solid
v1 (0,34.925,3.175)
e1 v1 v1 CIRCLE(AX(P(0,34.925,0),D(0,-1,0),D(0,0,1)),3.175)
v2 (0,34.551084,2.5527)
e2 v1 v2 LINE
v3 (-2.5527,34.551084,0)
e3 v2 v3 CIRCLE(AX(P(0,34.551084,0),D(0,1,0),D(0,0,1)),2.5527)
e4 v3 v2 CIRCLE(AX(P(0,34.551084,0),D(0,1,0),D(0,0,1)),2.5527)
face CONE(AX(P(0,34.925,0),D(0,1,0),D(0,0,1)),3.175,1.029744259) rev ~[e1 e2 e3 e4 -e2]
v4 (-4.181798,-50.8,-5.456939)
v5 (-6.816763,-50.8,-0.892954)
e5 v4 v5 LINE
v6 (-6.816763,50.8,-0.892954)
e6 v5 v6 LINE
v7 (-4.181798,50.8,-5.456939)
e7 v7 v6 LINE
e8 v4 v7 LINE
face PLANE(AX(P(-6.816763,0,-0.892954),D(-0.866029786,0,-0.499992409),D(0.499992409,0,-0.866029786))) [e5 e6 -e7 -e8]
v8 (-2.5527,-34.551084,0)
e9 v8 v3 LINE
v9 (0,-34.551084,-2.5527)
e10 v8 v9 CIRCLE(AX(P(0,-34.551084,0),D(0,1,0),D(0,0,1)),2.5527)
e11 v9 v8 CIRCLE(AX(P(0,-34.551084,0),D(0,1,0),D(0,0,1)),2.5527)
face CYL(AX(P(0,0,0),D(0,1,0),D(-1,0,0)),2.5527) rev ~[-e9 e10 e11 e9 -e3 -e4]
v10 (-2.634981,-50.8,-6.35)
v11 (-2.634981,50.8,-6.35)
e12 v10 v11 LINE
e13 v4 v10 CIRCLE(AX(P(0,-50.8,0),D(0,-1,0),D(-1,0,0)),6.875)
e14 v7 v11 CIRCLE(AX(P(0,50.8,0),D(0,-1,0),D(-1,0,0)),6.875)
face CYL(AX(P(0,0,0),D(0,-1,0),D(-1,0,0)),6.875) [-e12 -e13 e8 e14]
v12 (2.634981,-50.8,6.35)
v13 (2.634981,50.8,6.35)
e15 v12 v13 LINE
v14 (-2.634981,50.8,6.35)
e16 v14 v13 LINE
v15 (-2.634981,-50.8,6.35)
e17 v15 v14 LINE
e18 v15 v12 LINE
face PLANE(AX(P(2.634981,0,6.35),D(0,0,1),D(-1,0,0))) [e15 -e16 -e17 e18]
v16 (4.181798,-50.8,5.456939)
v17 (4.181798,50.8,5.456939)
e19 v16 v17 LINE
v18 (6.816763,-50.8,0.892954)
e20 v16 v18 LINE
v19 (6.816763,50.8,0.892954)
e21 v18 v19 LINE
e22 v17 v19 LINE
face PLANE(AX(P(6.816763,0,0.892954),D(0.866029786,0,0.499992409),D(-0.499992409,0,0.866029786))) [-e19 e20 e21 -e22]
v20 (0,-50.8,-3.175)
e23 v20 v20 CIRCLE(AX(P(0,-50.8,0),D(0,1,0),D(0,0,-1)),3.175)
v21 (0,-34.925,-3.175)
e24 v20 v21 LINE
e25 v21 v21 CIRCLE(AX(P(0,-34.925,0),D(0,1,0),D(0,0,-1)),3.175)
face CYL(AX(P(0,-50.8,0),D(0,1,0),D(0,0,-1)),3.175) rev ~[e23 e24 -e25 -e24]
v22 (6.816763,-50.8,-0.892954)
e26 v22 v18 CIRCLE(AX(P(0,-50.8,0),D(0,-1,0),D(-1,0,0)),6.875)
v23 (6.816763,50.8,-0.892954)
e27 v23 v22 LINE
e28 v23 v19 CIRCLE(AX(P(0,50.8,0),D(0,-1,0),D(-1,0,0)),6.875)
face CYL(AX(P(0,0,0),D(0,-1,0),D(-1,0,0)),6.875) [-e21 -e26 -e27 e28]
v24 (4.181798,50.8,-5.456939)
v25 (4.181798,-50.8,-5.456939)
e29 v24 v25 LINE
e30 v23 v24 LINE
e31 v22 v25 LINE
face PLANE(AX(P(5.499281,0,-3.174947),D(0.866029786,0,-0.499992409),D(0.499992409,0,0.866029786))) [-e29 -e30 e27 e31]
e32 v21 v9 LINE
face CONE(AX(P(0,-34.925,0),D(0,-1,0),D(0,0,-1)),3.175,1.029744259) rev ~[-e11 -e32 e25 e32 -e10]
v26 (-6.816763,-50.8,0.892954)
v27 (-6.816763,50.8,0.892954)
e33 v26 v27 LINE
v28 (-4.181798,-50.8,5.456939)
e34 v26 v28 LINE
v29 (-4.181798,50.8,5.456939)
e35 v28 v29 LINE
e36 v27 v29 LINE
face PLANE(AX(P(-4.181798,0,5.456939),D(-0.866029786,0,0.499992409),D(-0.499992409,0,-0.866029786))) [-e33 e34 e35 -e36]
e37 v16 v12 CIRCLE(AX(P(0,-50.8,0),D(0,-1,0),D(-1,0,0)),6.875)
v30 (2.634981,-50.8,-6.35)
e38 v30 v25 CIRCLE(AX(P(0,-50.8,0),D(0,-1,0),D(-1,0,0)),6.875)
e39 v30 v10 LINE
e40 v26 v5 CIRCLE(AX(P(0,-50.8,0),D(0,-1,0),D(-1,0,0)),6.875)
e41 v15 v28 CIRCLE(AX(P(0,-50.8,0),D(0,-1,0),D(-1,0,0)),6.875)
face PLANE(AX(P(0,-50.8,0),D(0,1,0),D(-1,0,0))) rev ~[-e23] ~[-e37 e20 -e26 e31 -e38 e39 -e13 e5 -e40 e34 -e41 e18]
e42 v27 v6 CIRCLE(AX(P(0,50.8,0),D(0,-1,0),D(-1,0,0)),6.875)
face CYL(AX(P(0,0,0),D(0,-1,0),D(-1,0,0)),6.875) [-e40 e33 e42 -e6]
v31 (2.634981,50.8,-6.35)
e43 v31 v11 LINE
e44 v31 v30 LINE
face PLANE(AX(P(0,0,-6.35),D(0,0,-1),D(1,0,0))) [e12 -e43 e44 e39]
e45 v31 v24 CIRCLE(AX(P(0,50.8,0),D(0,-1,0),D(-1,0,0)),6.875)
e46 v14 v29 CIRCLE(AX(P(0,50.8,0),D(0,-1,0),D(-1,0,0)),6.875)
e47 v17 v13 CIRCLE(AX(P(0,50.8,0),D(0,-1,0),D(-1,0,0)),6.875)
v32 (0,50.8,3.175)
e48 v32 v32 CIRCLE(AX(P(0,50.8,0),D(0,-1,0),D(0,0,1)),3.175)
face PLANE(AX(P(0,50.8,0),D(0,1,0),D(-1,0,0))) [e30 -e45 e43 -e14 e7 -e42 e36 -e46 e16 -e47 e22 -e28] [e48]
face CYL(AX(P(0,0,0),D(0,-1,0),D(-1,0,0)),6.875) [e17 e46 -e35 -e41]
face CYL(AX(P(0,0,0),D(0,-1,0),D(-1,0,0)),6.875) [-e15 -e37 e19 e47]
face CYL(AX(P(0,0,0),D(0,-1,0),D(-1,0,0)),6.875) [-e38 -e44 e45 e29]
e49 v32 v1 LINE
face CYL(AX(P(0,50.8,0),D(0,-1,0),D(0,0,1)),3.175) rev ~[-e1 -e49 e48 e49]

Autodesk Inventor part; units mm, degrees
ref_plane "YZ Plane" through (0, 0, 0) normal (1, 0, 0) x (0, 1, 0)
ref_plane "XZ Plane" through (0, 0, 0) normal (0, 1, 0) x (-1, 0, 0)
ref_plane "XY Plane" through (0, 0, 0) normal (0, 0, 1) x (1, 0, 0)
sketch "Sketch1" plane through (0, 0, 0) normal (0, 1, 0) x (-1, 0, 0)
  line L0 (-7.3323, 0) -> (-3.6662, 6.35)
  line L1 (-3.6662, 6.35) -> (3.6662, 6.35)
  line L2 (3.6662, 6.35) -> (7.3323, 0)
  line L3 (7.3323, 0) -> (3.6662, -6.35)
  line L4 (3.6662, -6.35) -> (-3.6662, -6.35)
  line L5 (-3.6662, -6.35) -> (-7.3323, 0)
  circle A0 centre (0, 0) radius 6.875
  circle A1 centre (0, 0) radius 6.35
  line L6 (-2.7496, -4.7625) -> (2.7496, -4.7625)
  line L7 (2.7496, -4.7625) -> (5.4993, 0)
  line L8 (5.4993, 0) -> (2.7496, 4.7625)
  line L9 (2.7496, 4.7625) -> (-2.7496, 4.7625)
  line L10 (-2.7496, 4.7625) -> (-5.4993, 0)
  line L11 (-5.4993, 0) -> (-2.7496, -4.7625)
  circle A2 centre (0, 0) radius 4.7625
  circle A3 centre (0, 0) radius 5.125
  circle A4 centre (0, 0) radius 9.525
  circle A5 centre (0, 0) radius 5.9436
  circle A6 centre (0, 0) radius 2.5527
  circle A7 centre (0, 0) radius 2.0193
  circle A8 centre (0, 0) radius 3.175
  circle A9 centre (0, 0) radius 8.7313
  point P0 (-4.1818, 5.457)
  point P1 (-2.635, 6.35)
  point P2 (-6.8168, -0.893)
  point P3 (-6.8168, 0.893)
  point P4 (-2.635, -6.35)
  point P5 (-4.1818, -5.457)
  point P6 (4.1818, -5.457)
  point P7 (2.635, -6.35)
  point P8 (6.8168, -0.893)
  point P9 (6.8168, 0.893)
  point P10 (2.635, 6.35)
  point P11 (4.1818, 5.457)
  point P12 (3.1778, -4.0208)
  point P13 (1.8932, -4.7625)
  point P14 (5.071, -0.7417)
  point P15 (5.071, 0.7417)
  point P16 (1.8932, 4.7625)
  point P17 (3.1778, 4.0208)
  point P18 (-3.1778, 4.0208)
  point P19 (-1.8932, 4.7625)
  point P20 (-5.071, -0.7417)
  point P21 (-5.071, 0.7417)
  point P22 (-1.8932, -4.7625)
  point P23 (-3.1778, -4.0208)
  dimension "d0" = 12.7
  dimension "d1" = 13.75
  dimension "d2" = 12.7
  dimension "d3" = 9.525
  dimension "d4" = 10.25
  dimension "d5" = 19.05
  dimension "d6" = 11.8872
  dimension "d7" = 5.1054
  dimension "d8" = 4.0386
  dimension "d9" = 6.35
  dimension "d153" = 0.7937
extrude "BaseProfile625Round" add sketch "Sketch1" along normal mid plane 101.6 contours L0 A0 L5 | A0 L0 | L0 A1 L5 A0 | L5 A0 | L0 A0 L1 A1 | A1 | L0 L1 A0 | A1 L4 A0 L5 | A0 L4 L5 | L1 A0 | L1 A0 L2 A1 | A1 L3 A0 L4 | L4 A0 | L1 L2 A0 | L2 A0 | L2 A0 L3 A1 | A0 L3 L4 | L3 A0 | L2 L3 A0 | L11 A3 L6 | A3 L11 A2 L6 | L6 A3 | A3 L11 | A2 L7 A3 L6 | A2 | A3 L7 L6 | L11 A3 L10 A2 | L11 L10 A3 | L7 A3 | A2 L8 A3 L7 | L10 A3 | L10 A3 L9 A2 | A3 L8 L7 | L10 L9 A3 | L9 A3 | L9 A3 L8 A2 | L8 A3 | L9 L8 A3 | A4 | A5 | A6 | A7 | A8 | A9
extrude "BaseProfileRoundTube" [suppressed]
extrude "BaseProfile500Hex" [suppressed]
extrude "BaseProfile500Thunderhex" cut sketch "Sketch1" along normal mid plane 914.4 contours L0 A0 L5 | A0 L0 | L5 A0 | L0 L1 A0 | A0 L4 L5 | L1 A0 | L4 A0 | L1 L2 A0 | L2 A0 | A0 L3 L4 | L3 A0 | L2 L3 A0 | A4 | A9
extrude "BaseProfile500Round" [suppressed]
extrude "BaseProfile375Hex" [suppressed]
extrude "BaseProfile375Thunderhex" [suppressed]
extrude "BaseProfile375Round" [suppressed]
extrude "TopShaftProfile1Hex500" [suppressed]
extrude "TopShaftProfile1ThunderHex500" [suppressed]
extrude "TopShaftProfile1Round500" [suppressed]
extrude "TopShaftProfile1Hex375" [suppressed]
extrude "TopShaftProfile1ThunderHex375" [suppressed]
extrude "TopShaftProfile1Round375" [suppressed]
extrude "TopShaftProfile2ThunderHex500" [suppressed]
extrude "TopShaftProfile2Round500" [suppressed]
extrude "TopShaftProfile2Hex375" [suppressed]
extrude "TopShaftProfile2ThunderHex375" [suppressed]
extrude "TopShaftProfile2Round375" [suppressed]
sketch "Sketch2" plane through (0, 0, 0) normal (1, 0, 0) x (0, 1, 0)
  line L0 (-92.7227, 0) -> (92.7227, 0) projected
  line L1 (0, -2.6658) -> (0, 15.9951) projected
  line L2 (50.8, 5.9436) -> (51.943, 5.9436)
  line L3 (51.943, 5.9436) -> (51.943, 6.35)
  line L4 (51.943, 6.35) -> (53.0225, 6.35)
  line L5 (53.0225, 6.35) -> (53.5305, 5.842)
  line L6 (53.5305, 5.842) -> (53.5305, 0)
  line L7 (50.8, 5.9436) -> (50.8, 0) construction
  line L8 (50.8, 5.9436) -> (50.8, 6.35)
  line L9 (50.8, 6.35) -> (50.8, 6.35)
  line L10 (50.8, 6.35) -> (50.8, 0)
  line L11 (50.8, 0) -> (53.5305, 0)
  line L12 (-50.8, 5.9436) -> (-51.943, 5.9436)
  line L13 (-51.943, 5.9436) -> (-51.943, 6.35)
  line L14 (-51.943, 6.35) -> (-53.0225, 6.35)
  line L15 (-53.0225, 6.35) -> (-53.5305, 5.842)
  line L16 (-53.5305, 5.842) -> (-53.5305, 0)
  line L17 (-50.8, 5.9436) -> (-50.8, 0) construction
  line L18 (-50.8, 5.9436) -> (-50.8, 6.35)
  line L19 (-50.8, 6.35) -> (-50.8, 6.35)
  line L20 (-50.8, 6.35) -> (-50.8, 0)
  line L21 (-50.8, 0) -> (-53.5305, 0)
  line L22 (0, 0) -> (0, 13.3292)
  line L23 (50.8, 0) -> (50.8, 6.35)
  point P0 (-53.5305, 0)
  point P1 (-50.8, 0)
  point P2 (30.955, 4.7625)
  point P3 (-17.4625, 6.2865)
  point P4 (25.4, 4.7625)
  point P5 (19.4005, 4.7625)
  point P6 (-25.4, 4.7625)
  point P7 (-26.543, 4.7625)
  dimension "TopBearingRoundDia2" = 12.7
  dimension "d65" = 45
  dimension "RetainingRingChamferSize2" = 0.508
  dimension "d72" = 50.8
  dimension "TopSnapRingDia2" = 11.8872
  dimension "d119" = 0.508
  dimension "d120" = 45
  dimension "d135" = 50.8
  dimension "d138" = 53.5305
  dimension "d139" = 51.943
  dimension "d140" = 50.8
  dimension "d141" = 11.8872
  dimension "d142" = 12.7
  dimension "d143" = 51.943
  dimension "d144" = 50.8
  dimension "d145" = 53.5305
revolve "TopRetentionGroove&BearingRound" [suppressed]
sketch "Sketch3" plane through (0, 50.8, 0) normal (0, 1, 0) x (1, 0, 0)
  point P0 (0, 0)
  point P1 (0, 0)
hole "TopShaftTappedHole" at (0, 50.8, 0) direction (0, -1, 0) diameter 6.35 depth 15.875 tip angle 118
thread "TopShaftThread" size "1/4-20 UNC" class "2B" standard "ANSI Unified Screw Threads" length 12.7
extrude "BottomShaftProfile1Hex500" [suppressed]
extrude "BottomShaftProfile1ThunderHex500" [suppressed]
extrude "BottomShaftProfile1Round500" [suppressed]
extrude "BottomShaftProfile1Hex375" [suppressed]
extrude "BottomShaftProfile1ThunderHex375" [suppressed]
extrude "BottomShaftProfile2ThunderHex500" [suppressed]
extrude "BottomShaftProfile1Round375" [suppressed]
extrude "BottomShaftProfile2Round500" [suppressed]
extrude "BottomShaftProfile2Hex375" [suppressed]
extrude "BottomShaftProfile2ThunderHex375" [suppressed]
extrude "BottomShaftProfile2Round375" [suppressed]
sketch "Sketch4" plane through (0, -50.8, 0) normal (0, -1, 0) x (1, 0, 0)
  point P0 (0, 0)
  point P1 (0, 0)
hole "BottomShaftTappedHole" at (0, -50.8, 0) direction (0, 1, 0) diameter 6.35 depth 15.875 tip angle 118
thread "BottomShaftThread" size "1/4-20 UNC" class "2B" standard "ANSI Unified Screw Threads" length 12.7
revolve "BottomRetentionGroove&BearingRound" [suppressed]
extrude "BaseProfile375ThunderhexHole" [suppressed]
extrude "BaseProfile500ThunderhexHole" cut sketch "Sketch1" along normal mid plane 914.4 contours A6 | A7
equation "\"d18\" = BottomShaftProfile1Depth + TopShaftProfile1Depth + BaseShaftLength + TopShaftProfile2Depth + BottomShaftProfile2Depth"
equation "\"d72\" = 0.5 * d18"
equation "\"BaseShaftLength\" = 101.6"
equation "\"TopShaftProfile1Depth\" = 0"
equation "\"TopShaftProfile2Depth\" = 0"
equation "\"BottomShaftProfile1Depth\" = 0"
equation "\"BottomShaftProfile2Depth\" = 0"
equation "\"TopShaftHoleDia\" = 6.35"
equation "\"BottomShaftHoleDia\" = 6.35"
equation "\"TopBearingRoundDia\" = 12.7"
equation "\"TopGrooveWidth\" = 1.143"
equation "\"TopBearingRoundDistance\" = 0"
equation "\"TopSnapRingDia\" = 11.8872"
equation "\"BottomBearingRoundDia\" = 12.7"
equation "\"BottomGrooveWidth\" = 1.143"
equation "\"BottomBearingRoundDistance\" = 0"
equation "\"BottomSnapRingDia\" = 11.8872"
equation "\"RoundTubeDia\" = 19.05"
equation "\"OrderLength\" = 114.3"
properties part number "217-4017, 4.5 in" material "Aluminum 7075"
